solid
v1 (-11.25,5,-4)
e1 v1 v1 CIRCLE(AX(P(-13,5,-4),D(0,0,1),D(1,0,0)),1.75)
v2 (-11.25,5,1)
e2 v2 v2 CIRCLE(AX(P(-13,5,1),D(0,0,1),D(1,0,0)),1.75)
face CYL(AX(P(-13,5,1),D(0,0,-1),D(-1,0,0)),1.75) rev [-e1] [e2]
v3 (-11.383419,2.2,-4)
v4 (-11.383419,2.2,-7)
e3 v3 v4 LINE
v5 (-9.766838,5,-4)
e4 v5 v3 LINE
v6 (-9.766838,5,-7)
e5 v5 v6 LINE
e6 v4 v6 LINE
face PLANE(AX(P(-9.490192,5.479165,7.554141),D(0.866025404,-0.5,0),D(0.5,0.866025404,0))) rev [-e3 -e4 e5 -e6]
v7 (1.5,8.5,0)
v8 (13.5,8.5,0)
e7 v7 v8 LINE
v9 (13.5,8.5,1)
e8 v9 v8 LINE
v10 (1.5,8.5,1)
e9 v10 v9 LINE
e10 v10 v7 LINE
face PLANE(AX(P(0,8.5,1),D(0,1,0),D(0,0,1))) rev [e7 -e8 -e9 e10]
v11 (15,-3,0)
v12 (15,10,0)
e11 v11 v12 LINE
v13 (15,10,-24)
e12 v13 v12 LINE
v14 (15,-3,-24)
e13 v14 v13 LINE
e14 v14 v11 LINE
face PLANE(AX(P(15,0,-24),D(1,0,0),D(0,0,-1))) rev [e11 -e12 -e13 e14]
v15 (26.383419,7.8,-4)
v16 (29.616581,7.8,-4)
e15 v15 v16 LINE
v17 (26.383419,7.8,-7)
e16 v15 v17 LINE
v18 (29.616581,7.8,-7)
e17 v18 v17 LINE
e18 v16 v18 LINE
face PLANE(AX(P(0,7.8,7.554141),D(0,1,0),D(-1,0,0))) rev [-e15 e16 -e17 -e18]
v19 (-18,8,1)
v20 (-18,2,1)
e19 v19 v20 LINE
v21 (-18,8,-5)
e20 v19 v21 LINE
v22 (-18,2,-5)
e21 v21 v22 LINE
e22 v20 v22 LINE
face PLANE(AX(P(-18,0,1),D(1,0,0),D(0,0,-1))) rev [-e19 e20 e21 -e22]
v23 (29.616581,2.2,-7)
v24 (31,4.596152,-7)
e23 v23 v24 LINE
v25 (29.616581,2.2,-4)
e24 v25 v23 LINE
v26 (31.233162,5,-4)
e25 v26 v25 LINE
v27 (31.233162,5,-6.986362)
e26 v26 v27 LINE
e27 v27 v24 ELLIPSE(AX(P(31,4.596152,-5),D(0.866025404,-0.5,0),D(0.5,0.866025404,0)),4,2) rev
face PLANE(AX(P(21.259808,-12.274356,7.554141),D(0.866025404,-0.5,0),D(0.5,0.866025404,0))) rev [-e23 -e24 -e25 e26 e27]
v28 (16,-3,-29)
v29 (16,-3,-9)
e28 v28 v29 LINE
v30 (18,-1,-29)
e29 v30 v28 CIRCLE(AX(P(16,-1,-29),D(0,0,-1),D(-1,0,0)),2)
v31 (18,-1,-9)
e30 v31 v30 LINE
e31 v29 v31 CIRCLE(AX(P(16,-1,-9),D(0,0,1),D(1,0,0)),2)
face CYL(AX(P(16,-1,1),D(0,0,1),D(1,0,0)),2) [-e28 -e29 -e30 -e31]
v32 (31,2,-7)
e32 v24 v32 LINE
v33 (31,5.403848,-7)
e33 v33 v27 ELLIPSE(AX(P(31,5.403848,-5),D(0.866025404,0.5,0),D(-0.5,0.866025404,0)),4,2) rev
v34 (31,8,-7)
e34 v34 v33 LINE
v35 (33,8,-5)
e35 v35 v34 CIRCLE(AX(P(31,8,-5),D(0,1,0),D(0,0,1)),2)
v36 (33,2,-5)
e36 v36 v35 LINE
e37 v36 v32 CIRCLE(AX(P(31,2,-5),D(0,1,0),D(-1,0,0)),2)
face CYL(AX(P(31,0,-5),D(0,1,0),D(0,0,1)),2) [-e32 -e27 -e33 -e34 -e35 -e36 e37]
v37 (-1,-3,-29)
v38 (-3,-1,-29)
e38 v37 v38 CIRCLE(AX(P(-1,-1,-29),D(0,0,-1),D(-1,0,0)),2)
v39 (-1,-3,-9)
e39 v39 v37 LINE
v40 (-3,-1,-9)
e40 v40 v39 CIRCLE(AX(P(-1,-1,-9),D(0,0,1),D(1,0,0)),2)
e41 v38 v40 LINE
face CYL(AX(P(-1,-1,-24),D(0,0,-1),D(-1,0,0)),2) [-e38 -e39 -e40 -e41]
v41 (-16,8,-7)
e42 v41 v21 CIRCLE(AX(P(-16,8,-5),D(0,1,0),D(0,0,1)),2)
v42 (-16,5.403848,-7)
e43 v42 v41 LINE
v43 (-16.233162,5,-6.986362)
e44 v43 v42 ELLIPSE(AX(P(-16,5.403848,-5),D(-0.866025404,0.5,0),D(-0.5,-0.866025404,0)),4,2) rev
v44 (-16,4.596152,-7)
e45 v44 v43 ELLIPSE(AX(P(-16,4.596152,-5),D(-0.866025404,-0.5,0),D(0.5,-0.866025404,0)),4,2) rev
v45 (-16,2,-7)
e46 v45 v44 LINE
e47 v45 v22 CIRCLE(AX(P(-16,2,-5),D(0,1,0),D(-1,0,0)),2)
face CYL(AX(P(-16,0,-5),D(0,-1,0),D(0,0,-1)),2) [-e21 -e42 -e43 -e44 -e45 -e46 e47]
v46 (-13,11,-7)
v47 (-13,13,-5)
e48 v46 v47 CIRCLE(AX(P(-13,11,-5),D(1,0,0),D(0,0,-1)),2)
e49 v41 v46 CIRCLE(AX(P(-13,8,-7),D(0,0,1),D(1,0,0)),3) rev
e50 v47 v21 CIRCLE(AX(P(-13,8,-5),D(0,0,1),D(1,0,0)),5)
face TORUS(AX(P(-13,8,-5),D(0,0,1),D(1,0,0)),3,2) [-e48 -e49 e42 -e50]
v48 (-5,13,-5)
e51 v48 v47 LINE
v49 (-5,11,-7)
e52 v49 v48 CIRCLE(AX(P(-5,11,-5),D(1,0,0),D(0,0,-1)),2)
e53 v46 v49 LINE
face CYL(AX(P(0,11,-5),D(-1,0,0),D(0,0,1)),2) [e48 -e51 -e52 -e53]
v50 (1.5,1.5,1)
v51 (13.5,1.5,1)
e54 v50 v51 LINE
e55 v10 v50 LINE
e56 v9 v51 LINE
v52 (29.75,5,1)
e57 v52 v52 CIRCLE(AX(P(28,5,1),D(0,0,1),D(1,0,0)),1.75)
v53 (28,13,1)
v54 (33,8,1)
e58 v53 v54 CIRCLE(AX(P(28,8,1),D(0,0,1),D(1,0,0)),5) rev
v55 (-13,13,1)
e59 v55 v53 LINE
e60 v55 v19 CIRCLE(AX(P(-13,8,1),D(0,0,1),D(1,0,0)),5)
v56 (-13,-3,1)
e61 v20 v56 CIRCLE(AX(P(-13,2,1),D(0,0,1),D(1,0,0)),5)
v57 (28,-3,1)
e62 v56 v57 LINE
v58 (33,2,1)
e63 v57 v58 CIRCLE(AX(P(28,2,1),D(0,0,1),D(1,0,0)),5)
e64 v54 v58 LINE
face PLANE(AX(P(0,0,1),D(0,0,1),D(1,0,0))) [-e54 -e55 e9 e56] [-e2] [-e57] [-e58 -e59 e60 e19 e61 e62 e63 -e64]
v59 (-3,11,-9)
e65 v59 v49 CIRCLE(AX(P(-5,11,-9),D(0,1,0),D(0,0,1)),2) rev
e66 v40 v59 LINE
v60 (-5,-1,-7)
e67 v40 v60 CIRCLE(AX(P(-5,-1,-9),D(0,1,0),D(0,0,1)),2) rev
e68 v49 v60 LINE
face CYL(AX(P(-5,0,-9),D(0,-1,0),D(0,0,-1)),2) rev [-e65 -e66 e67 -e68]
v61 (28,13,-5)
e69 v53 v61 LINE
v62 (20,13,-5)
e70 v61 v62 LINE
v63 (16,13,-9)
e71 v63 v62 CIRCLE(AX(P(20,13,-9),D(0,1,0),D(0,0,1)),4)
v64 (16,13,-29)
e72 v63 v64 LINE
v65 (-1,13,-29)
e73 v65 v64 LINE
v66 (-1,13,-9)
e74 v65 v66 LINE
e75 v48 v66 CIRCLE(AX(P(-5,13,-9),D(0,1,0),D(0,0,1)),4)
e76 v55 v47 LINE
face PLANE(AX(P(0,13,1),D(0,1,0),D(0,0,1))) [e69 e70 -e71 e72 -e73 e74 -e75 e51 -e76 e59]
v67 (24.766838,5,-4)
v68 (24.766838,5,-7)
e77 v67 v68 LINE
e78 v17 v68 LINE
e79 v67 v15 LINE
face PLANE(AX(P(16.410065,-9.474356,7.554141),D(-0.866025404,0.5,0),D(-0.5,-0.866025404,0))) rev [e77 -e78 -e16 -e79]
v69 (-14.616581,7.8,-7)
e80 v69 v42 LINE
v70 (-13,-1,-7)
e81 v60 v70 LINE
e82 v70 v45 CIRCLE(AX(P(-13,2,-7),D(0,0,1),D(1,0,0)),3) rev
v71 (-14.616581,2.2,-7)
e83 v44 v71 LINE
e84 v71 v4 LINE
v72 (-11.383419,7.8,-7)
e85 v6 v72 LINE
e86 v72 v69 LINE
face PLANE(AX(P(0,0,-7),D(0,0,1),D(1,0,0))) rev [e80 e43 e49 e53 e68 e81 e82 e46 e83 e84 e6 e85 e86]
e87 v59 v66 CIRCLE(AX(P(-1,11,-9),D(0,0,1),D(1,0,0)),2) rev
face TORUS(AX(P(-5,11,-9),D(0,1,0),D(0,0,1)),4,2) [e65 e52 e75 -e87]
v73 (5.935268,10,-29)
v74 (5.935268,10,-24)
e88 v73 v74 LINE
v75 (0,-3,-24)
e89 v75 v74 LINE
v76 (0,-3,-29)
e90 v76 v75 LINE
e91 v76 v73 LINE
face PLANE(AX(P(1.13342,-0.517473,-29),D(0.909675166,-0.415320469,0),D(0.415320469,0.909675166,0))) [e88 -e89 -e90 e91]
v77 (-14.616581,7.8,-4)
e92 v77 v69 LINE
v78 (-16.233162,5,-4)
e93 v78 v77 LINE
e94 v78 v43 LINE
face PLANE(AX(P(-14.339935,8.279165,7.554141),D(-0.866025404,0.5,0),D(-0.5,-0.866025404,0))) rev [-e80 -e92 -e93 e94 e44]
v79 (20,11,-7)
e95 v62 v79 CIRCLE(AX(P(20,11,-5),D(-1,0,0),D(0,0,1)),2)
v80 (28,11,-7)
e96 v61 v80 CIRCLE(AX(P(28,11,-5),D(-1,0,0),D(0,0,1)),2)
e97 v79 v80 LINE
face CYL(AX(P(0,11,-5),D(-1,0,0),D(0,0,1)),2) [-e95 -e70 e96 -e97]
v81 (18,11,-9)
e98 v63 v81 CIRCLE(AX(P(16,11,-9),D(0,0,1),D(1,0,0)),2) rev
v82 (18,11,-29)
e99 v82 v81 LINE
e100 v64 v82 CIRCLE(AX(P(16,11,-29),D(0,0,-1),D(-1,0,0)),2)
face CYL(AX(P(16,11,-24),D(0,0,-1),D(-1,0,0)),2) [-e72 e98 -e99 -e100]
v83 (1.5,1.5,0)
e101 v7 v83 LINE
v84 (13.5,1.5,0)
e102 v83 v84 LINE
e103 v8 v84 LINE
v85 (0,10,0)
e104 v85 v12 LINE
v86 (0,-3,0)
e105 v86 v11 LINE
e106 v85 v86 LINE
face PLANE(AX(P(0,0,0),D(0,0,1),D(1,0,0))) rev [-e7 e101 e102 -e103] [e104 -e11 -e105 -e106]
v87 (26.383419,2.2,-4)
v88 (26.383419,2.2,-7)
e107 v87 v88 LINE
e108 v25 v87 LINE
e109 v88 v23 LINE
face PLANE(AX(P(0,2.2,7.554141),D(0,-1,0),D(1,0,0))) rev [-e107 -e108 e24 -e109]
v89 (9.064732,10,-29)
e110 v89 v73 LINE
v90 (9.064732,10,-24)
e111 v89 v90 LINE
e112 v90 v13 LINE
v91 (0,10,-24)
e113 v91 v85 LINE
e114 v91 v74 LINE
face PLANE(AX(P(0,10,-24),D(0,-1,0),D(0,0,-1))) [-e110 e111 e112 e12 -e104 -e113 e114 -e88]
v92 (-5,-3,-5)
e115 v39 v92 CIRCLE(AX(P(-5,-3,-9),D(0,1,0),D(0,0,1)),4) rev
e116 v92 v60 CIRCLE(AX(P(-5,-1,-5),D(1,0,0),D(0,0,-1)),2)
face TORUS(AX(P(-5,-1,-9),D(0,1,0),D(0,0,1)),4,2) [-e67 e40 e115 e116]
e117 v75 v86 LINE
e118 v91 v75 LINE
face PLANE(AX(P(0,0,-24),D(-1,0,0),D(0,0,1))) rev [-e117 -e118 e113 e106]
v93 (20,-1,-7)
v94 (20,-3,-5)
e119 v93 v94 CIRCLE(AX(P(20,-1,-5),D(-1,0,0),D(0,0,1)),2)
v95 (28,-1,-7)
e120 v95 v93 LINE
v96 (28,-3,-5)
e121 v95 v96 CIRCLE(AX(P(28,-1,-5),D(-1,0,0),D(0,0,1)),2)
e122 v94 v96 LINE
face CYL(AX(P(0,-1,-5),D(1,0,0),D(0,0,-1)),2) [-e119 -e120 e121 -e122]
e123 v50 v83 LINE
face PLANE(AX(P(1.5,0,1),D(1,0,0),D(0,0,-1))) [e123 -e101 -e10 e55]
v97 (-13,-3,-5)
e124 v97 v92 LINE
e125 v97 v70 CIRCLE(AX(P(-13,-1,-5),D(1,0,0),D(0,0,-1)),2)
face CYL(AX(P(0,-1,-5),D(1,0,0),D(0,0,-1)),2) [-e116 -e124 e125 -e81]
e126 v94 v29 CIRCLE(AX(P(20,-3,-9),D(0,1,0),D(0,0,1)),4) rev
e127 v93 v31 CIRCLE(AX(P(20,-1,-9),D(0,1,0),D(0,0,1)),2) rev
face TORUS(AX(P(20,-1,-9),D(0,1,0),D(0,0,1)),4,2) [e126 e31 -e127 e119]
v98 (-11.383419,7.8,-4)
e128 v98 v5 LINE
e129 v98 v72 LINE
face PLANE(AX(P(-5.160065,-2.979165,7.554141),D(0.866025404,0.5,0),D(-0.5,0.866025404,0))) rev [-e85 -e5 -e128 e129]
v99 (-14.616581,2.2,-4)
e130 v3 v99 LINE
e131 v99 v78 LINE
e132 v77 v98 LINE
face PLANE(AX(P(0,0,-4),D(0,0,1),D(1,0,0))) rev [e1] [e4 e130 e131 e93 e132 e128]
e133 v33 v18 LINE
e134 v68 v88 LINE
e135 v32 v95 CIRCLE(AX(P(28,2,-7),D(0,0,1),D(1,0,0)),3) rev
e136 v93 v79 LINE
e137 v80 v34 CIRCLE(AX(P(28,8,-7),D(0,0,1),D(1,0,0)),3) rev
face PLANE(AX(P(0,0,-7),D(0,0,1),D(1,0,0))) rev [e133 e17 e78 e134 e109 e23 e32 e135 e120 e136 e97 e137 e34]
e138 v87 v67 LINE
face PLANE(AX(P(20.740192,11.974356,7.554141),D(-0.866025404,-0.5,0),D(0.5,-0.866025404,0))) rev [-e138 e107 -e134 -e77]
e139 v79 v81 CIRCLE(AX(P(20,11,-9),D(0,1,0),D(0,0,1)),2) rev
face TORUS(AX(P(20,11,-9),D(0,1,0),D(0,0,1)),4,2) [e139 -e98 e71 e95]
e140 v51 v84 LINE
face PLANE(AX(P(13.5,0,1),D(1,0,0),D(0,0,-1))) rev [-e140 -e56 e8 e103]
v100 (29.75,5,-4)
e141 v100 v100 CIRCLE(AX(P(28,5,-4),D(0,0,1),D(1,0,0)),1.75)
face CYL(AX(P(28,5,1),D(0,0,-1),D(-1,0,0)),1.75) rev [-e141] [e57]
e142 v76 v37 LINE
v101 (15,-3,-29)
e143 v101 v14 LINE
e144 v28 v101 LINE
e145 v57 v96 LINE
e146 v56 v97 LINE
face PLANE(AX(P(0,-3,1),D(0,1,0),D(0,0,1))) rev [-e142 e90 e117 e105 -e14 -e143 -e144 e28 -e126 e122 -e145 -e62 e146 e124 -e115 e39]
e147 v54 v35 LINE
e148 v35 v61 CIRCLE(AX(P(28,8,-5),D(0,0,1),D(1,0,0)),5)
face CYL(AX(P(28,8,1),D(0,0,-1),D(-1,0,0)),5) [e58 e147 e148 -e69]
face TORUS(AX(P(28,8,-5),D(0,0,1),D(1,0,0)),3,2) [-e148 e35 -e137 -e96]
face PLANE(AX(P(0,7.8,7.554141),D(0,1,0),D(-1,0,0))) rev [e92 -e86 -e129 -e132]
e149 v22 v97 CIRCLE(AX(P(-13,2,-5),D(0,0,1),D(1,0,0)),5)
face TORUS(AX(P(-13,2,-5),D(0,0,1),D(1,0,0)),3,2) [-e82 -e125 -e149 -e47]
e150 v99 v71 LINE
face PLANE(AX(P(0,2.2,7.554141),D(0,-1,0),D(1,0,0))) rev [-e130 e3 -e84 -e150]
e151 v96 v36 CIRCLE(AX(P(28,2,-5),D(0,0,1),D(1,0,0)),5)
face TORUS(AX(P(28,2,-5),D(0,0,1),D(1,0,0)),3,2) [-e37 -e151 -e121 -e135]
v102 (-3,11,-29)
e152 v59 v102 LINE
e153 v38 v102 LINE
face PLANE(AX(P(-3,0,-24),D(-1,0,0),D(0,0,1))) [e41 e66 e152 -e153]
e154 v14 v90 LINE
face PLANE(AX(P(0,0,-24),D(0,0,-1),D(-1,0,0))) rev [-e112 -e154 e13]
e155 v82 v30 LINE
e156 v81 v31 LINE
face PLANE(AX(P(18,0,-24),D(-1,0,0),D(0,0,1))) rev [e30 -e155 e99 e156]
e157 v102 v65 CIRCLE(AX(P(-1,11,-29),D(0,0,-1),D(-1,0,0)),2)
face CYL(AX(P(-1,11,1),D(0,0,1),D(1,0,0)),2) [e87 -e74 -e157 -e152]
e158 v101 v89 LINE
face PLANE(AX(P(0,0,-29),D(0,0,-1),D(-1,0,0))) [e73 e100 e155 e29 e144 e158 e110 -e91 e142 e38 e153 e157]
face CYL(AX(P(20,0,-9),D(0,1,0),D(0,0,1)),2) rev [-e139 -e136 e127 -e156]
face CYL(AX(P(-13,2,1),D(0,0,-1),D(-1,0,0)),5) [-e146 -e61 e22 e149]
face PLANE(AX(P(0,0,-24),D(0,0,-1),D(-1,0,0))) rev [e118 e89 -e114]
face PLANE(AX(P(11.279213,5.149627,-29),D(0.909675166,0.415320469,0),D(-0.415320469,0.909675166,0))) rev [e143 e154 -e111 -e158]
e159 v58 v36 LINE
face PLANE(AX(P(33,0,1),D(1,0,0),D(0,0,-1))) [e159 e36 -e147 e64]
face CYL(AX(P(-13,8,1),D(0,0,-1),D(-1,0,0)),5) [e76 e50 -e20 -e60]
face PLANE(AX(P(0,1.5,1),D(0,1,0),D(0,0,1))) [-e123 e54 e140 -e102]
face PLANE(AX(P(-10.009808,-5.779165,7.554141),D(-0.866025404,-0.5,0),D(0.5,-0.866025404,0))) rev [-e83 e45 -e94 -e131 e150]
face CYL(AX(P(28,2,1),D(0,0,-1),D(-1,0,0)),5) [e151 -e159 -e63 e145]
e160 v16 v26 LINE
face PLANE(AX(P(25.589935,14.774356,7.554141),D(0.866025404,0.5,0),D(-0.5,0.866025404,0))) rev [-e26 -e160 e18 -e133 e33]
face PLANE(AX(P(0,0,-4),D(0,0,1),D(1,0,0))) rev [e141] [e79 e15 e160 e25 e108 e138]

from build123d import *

# Parameters (mm, degrees)
SKETCH1_W           = 15
SKETCH1_H           = 10
SKETCH1_W_2         = 12
SKETCH1_H_2         = 7
SKETCH1_H_3         = 3
SKETCH1_R           = 1.75
BOSS_EXTRUDE1_DEPTH = 1
BOSS_EXTRUDE2_DEPTH = 24
BOSS_EXTRUDE3_START = -7
SKETCH1_5_R         = 1.75
BOSS_EXTRUDE3_DEPTH = 7
BOSS_EXTRUDE4_DEPTH = 5
CUT_EXTRUDE1_DEPTH  = 20
FILLET1_R           = 2


with BuildPart() as part:
    # Sketch1 → Boss-Extrude1 (new body)
    # profile 1 of 7: a face of its own
    with BuildSketch(Plane.XY):
        with Locations((7.5, 5)):
            Rectangle(SKETCH1_W, SKETCH1_H)
        with Locations((7.5, 5)):
            Rectangle(SKETCH1_W_2, SKETCH1_H_2, mode=Mode.SUBTRACT)
    # profile 2 of 7: a face of its own
    with BuildSketch(Plane.XY):
        with Locations((7.5, -1.5)):
            Rectangle(SKETCH1_W, SKETCH1_H_3)
    # profile 3 of 7: a face of its own
    with BuildSketch(Plane.XY):
        Polygon((0, -3), (0, 0), (0, 10), (15, 10), (15, 0), (15, -3), (18, -3), (18, 13), (-3, 13), (-3, -3), align=None)
    # profile 4 of 7: a face of its own
    with BuildSketch(Plane.XY):
        with BuildLine():
            Line((-13, -3), (-3, -3))
            Line((-3, -3), (-3, 13))
            Line((-3, 13), (-13, 13))
            ThreePointArc((-13, 13), (-16.535533906, 11.535533906), (-18, 8))
            Line((-18, 8), (-18, 2))
            ThreePointArc((-18, 2), (-16.535533906, -1.535533906), (-13, -3))
        make_face()
        Polygon((-11.383419246, 7.8), (-9.766838493, 5), (-11.383419246, 2.2), (-14.616580754, 2.2), (-16.233161507, 5), (-14.616580754, 7.8), align=None, mode=Mode.SUBTRACT)
    # profile 5 of 7: a face of its own
    with BuildSketch(Plane.XY):
        Polygon((-14.616580754, 2.2), (-11.383419246, 2.2), (-9.766838493, 5), (-11.383419246, 7.8), (-14.616580754, 7.8), (-16.233161507, 5), align=None)
        with Locations((-13, 5)):
            Circle(SKETCH1_R, mode=Mode.SUBTRACT)
    # profile 6 of 7: a face of its own
    with BuildSketch(Plane.XY):
        with BuildLine():
            Line((18, 13), (18, -3))
            Line((18, -3), (28, -3))
            ThreePointArc((28, -3), (31.535533906, -1.535533906), (33, 2))
            Line((33, 2), (33, 8))
            ThreePointArc((33, 8), (31.535533906, 11.535533906), (28, 13))
            Line((28, 13), (18, 13))
        make_face()
        Polygon((26.383419246, 2.2), (24.766838493, 5), (26.383419246, 7.8), (29.616580754, 7.8), (31.233161507, 5), (29.616580754, 2.2), align=None, mode=Mode.SUBTRACT)
    # profile 7 of 7: a face of its own
    with BuildSketch(Plane.XY):
        Polygon((29.616580754, 7.8), (26.383419246, 7.8), (24.766838493, 5), (26.383419246, 2.2), (29.616580754, 2.2), (31.233161507, 5), align=None)
        with Locations((28, 5)):
            Circle(SKETCH1_R, mode=Mode.SUBTRACT)
    extrude(amount=BOSS_EXTRUDE1_DEPTH)

    # Sketch1<4> → Boss-Extrude2 (add)
    with BuildSketch(Plane.XY):
        Polygon((0, -3), (0, 0), (0, 10), (15, 10), (15, 0), (15, -3), (18, -3), (18, 13), (-3, 13), (-3, -3), align=None)
    extrude(amount=-BOSS_EXTRUDE2_DEPTH)

    # Sketch1<5> → Boss-Extrude3 (add)
    # profile 1 of 4: a face of its own
    with BuildSketch(Plane.XY.offset(BOSS_EXTRUDE3_START)):
        with BuildLine():
            Line((18, 13), (18, -3))
            Line((18, -3), (28, -3))
            ThreePointArc((28, -3), (31.535533906, -1.535533906), (33, 2))
            Line((33, 2), (33, 8))
            ThreePointArc((33, 8), (31.535533906, 11.535533906), (28, 13))
            Line((28, 13), (18, 13))
        make_face()
        Polygon((26.383419246, 2.2), (24.766838493, 5), (26.383419246, 7.8), (29.616580754, 7.8), (31.233161507, 5), (29.616580754, 2.2), align=None, mode=Mode.SUBTRACT)
    # profile 2 of 4: a face of its own
    with BuildSketch(Plane.XY.offset(BOSS_EXTRUDE3_START)):
        Polygon((29.616580754, 7.8), (26.383419246, 7.8), (24.766838493, 5), (26.383419246, 2.2), (29.616580754, 2.2), (31.233161507, 5), align=None)
        with Locations((28, 5)):
            Circle(SKETCH1_5_R, mode=Mode.SUBTRACT)
    # profile 3 of 4: a face of its own
    with BuildSketch(Plane.XY.offset(BOSS_EXTRUDE3_START)):
        with BuildLine():
            Line((-13, -3), (-3, -3))
            Line((-3, -3), (-3, 13))
            Line((-3, 13), (-13, 13))
            ThreePointArc((-13, 13), (-16.535533906, 11.535533906), (-18, 8))
            Line((-18, 8), (-18, 2))
            ThreePointArc((-18, 2), (-16.535533906, -1.535533906), (-13, -3))
        make_face()
        Polygon((-11.383419246, 7.8), (-9.766838493, 5), (-11.383419246, 2.2), (-14.616580754, 2.2), (-16.233161507, 5), (-14.616580754, 7.8), align=None, mode=Mode.SUBTRACT)
    # profile 4 of 4: a face of its own
    with BuildSketch(Plane.XY.offset(BOSS_EXTRUDE3_START)):
        Polygon((-14.616580754, 2.2), (-11.383419246, 2.2), (-9.766838493, 5), (-11.383419246, 7.8), (-14.616580754, 7.8), (-16.233161507, 5), align=None)
        with Locations((-13, 5)):
            Circle(SKETCH1_5_R, mode=Mode.SUBTRACT)
    extrude(amount=BOSS_EXTRUDE3_DEPTH)

    # Sketch2 → Boss-Extrude4 (add)
    with BuildSketch(Plane(origin=(0, 0, -24), x_dir=(-1, 0, 0), z_dir=(0, 0, -1))):
        Polygon((-18, -3), (-15, -3), (-15, 10), (0, 10), (0, -3), (3, -3), (3, 13), (-18, 13), align=None)
        Polygon((-4.316136934, 6.453621675), (0, -3), (0, 10), (-5.935268204, 10), align=None)
        Polygon((-15, 10), (-15, -3), (-10.683863071, 6.453621665), (-9.064731796, 10), align=None)
    extrude(amount=BOSS_EXTRUDE4_DEPTH)

    # Sketch2<4> → Cut-Extrude1 (cut)
    with BuildSketch(Plane(origin=(0, 0, -24), x_dir=(-1, 0, 0), z_dir=(0, 0, -1))):
        Polygon((14.616580754, 7.8), (11.383419246, 7.8), (9.766838493, 5), (11.383419246, 2.2), (14.616580754, 2.2), (16.233161507, 5), align=None)
        Polygon((-29.616580754, 2.2), (-26.383419246, 2.2), (-24.766838493, 5), (-26.383419246, 7.8), (-29.616580754, 7.8), (-31.233161507, 5), align=None)
    extrude(amount=-CUT_EXTRUDE1_DEPTH, mode=Mode.SUBTRACT)

    # Fillet1
    # the kernel refuses this fillet: 2 mm, written as the material it adds along each edge
    with BuildSketch(Plane(origin=(18, 13, -7), x_dir=(1, 0, 0), z_dir=(0, -1, 0)), Plane(origin=(-3, -3, -7), x_dir=(-1, 0, 0), z_dir=(0, 1, 0))) as fillet1_piece_1:
        with BuildLine():
            CenterArc((FILLET1_R, -FILLET1_R), FILLET1_R, 90, 90)
            Line((0, -FILLET1_R), (0, 0))
            Line((0, 0), (FILLET1_R, 0))
        make_face()
    extrude(amount=16)
    # the kernel refuses this fillet: 2 mm, written as the material it takes off along each edge
    with BuildSketch(Plane(origin=(-3, -3, -9), x_dir=(1, 0, 0), z_dir=(0, 0, -1)), Plane(origin=(-3, 13, -34), x_dir=(1, 0, 0), z_dir=(0, 0, 1)), Plane(origin=(18, 13, -9), x_dir=(-1, 0, 0), z_dir=(0, 0, -1)), Plane(origin=(18, -3, -34), x_dir=(-1, 0, 0), z_dir=(0, 0, 1))) as fillet1_2_piece_1:
        with BuildLine():
            CenterArc((FILLET1_R, -FILLET1_R), FILLET1_R, 90, 90)
            Line((0, -FILLET1_R), (0, 0))
            Line((0, 0), (FILLET1_R, 0))
        make_face()
    extrude(amount=25, mode=Mode.SUBTRACT)
    with BuildSketch(Plane(origin=(28, 2, -7), x_dir=(0, -1, 0), z_dir=(-1, 0, 0))) as fillet1_2_piece_2:
        with BuildLine():
            CenterArc((5 - FILLET1_R, FILLET1_R), FILLET1_R, 270, 90)
            Line((5 - FILLET1_R, 0), (5, 0))
            Line((5, 0), (5, FILLET1_R))
        make_face()
    revolve(axis=Axis((28, 2, -7), (0, 0, 1)), revolution_arc=90, mode=Mode.SUBTRACT)
    with BuildSketch(Plane(origin=(20, -3, -7), x_dir=(0, 0, 1), z_dir=(1, 0, 0)), Plane(origin=(28, 13, -7), x_dir=(0, 0, 1), z_dir=(-1, 0, 0)), Plane(origin=(-13, -3, -7), x_dir=(0, 0, 1), z_dir=(1, 0, 0)), Plane(origin=(-5, 13, -7), x_dir=(0, 0, 1), z_dir=(-1, 0, 0))) as fillet1_2_piece_3:
        with BuildLine():
            CenterArc((FILLET1_R, -FILLET1_R), FILLET1_R, 90, 90)
            Line((0, -FILLET1_R), (0, 0))
            Line((0, 0), (FILLET1_R, 0))
        make_face()
    extrude(amount=8, mode=Mode.SUBTRACT)
    with BuildSketch(Plane(origin=(28, 8, -7), x_dir=(1, 0, 0), z_dir=(0, -1, 0))) as fillet1_2_piece_4:
        with BuildLine():
            CenterArc((5 - FILLET1_R, FILLET1_R), FILLET1_R, 270, 90)
            Line((5 - FILLET1_R, 0), (5, 0))
            Line((5, 0), (5, FILLET1_R))
        make_face()
    revolve(axis=Axis((28, 8, -7), (0, 0, 1)), revolution_arc=90, mode=Mode.SUBTRACT)
    with BuildSketch(Plane(origin=(33, 2, -7), x_dir=(0, 0, 1), z_dir=(0, 1, 0)), Plane(origin=(-18, 8, -7), x_dir=(0, 0, 1), z_dir=(0, -1, 0))) as fillet1_2_piece_5:
        with BuildLine():
            CenterArc((FILLET1_R, -FILLET1_R), FILLET1_R, 90, 90)
            Line((0, -FILLET1_R), (0, 0))
            Line((0, 0), (FILLET1_R, 0))
        make_face()
    extrude(amount=6, mode=Mode.SUBTRACT)
    with BuildSketch(Plane(origin=(-13, 2, -7), x_dir=(-1, 0, 0), z_dir=(0, 1, 0))) as fillet1_2_piece_6:
        with BuildLine():
            CenterArc((5 - FILLET1_R, FILLET1_R), FILLET1_R, 270, 90)
            Line((5 - FILLET1_R, 0), (5, 0))
            Line((5, 0), (5, FILLET1_R))
        make_face()
    revolve(axis=Axis((-13, 2, -7), (0, 0, 1)), revolution_arc=90, mode=Mode.SUBTRACT)
    with BuildSketch(Plane(origin=(-13, 8, -7), x_dir=(0, 1, 0), z_dir=(1, 0, 0))) as fillet1_2_piece_7:
        with BuildLine():
            CenterArc((5 - FILLET1_R, FILLET1_R), FILLET1_R, 270, 90)
            Line((5 - FILLET1_R, 0), (5, 0))
            Line((5, 0), (5, FILLET1_R))
        make_face()
    revolve(axis=Axis((-13, 8, -7), (0, 0, 1)), revolution_arc=90, mode=Mode.SUBTRACT)
    with BuildSketch(Plane(origin=(-5, 13, -9), x_dir=(0, 0, 1), z_dir=(-1, 0, 0))) as fillet1_2_piece_8:
        with BuildLine():
            CenterArc((2 + FILLET1_R, -FILLET1_R), FILLET1_R, 90, 90)
            Line((2, -FILLET1_R), (2, 0))
            Line((2, 0), (2 + FILLET1_R, 0))
        make_face()
    revolve(axis=Axis((-5, 13, -9), (0, 1, 0)), revolution_arc=90, mode=Mode.SUBTRACT)
    with BuildSketch(Plane(origin=(-5, -3, -9), x_dir=(0, 0, 1), z_dir=(-1, 0, 0))) as fillet1_2_piece_9:
        with BuildLine():
            CenterArc((2 + FILLET1_R, FILLET1_R), FILLET1_R, 180, 90)
            Line((2, FILLET1_R), (2, 0))
            Line((2, 0), (2 + FILLET1_R, 0))
        make_face()
    revolve(axis=Axis((-5, -3, -9), (0, 1, 0)), revolution_arc=90, mode=Mode.SUBTRACT)
    with BuildSketch(Plane(origin=(20, 13, -9), x_dir=(0, 0, 1), z_dir=(1, 0, 0))) as fillet1_2_piece_10:
        with BuildLine():
            CenterArc((2 + FILLET1_R, FILLET1_R), FILLET1_R, 180, 90)
            Line((2, FILLET1_R), (2, 0))
            Line((2, 0), (2 + FILLET1_R, 0))
        make_face()
    revolve(axis=Axis((20, 13, -9), (0, -1, 0)), revolution_arc=90, mode=Mode.SUBTRACT)
    with BuildSketch(Plane(origin=(20, -3, -9), x_dir=(0, 0, 1), z_dir=(1, 0, 0))) as fillet1_2_piece_11:
        with BuildLine():
            CenterArc((2 + FILLET1_R, -FILLET1_R), FILLET1_R, 90, 90)
            Line((2, -FILLET1_R), (2, 0))
            Line((2, 0), (2 + FILLET1_R, 0))
        make_face()
    revolve(axis=Axis((20, -3, -9), (0, -1, 0)), revolution_arc=90, mode=Mode.SUBTRACT)


solid = part.part
